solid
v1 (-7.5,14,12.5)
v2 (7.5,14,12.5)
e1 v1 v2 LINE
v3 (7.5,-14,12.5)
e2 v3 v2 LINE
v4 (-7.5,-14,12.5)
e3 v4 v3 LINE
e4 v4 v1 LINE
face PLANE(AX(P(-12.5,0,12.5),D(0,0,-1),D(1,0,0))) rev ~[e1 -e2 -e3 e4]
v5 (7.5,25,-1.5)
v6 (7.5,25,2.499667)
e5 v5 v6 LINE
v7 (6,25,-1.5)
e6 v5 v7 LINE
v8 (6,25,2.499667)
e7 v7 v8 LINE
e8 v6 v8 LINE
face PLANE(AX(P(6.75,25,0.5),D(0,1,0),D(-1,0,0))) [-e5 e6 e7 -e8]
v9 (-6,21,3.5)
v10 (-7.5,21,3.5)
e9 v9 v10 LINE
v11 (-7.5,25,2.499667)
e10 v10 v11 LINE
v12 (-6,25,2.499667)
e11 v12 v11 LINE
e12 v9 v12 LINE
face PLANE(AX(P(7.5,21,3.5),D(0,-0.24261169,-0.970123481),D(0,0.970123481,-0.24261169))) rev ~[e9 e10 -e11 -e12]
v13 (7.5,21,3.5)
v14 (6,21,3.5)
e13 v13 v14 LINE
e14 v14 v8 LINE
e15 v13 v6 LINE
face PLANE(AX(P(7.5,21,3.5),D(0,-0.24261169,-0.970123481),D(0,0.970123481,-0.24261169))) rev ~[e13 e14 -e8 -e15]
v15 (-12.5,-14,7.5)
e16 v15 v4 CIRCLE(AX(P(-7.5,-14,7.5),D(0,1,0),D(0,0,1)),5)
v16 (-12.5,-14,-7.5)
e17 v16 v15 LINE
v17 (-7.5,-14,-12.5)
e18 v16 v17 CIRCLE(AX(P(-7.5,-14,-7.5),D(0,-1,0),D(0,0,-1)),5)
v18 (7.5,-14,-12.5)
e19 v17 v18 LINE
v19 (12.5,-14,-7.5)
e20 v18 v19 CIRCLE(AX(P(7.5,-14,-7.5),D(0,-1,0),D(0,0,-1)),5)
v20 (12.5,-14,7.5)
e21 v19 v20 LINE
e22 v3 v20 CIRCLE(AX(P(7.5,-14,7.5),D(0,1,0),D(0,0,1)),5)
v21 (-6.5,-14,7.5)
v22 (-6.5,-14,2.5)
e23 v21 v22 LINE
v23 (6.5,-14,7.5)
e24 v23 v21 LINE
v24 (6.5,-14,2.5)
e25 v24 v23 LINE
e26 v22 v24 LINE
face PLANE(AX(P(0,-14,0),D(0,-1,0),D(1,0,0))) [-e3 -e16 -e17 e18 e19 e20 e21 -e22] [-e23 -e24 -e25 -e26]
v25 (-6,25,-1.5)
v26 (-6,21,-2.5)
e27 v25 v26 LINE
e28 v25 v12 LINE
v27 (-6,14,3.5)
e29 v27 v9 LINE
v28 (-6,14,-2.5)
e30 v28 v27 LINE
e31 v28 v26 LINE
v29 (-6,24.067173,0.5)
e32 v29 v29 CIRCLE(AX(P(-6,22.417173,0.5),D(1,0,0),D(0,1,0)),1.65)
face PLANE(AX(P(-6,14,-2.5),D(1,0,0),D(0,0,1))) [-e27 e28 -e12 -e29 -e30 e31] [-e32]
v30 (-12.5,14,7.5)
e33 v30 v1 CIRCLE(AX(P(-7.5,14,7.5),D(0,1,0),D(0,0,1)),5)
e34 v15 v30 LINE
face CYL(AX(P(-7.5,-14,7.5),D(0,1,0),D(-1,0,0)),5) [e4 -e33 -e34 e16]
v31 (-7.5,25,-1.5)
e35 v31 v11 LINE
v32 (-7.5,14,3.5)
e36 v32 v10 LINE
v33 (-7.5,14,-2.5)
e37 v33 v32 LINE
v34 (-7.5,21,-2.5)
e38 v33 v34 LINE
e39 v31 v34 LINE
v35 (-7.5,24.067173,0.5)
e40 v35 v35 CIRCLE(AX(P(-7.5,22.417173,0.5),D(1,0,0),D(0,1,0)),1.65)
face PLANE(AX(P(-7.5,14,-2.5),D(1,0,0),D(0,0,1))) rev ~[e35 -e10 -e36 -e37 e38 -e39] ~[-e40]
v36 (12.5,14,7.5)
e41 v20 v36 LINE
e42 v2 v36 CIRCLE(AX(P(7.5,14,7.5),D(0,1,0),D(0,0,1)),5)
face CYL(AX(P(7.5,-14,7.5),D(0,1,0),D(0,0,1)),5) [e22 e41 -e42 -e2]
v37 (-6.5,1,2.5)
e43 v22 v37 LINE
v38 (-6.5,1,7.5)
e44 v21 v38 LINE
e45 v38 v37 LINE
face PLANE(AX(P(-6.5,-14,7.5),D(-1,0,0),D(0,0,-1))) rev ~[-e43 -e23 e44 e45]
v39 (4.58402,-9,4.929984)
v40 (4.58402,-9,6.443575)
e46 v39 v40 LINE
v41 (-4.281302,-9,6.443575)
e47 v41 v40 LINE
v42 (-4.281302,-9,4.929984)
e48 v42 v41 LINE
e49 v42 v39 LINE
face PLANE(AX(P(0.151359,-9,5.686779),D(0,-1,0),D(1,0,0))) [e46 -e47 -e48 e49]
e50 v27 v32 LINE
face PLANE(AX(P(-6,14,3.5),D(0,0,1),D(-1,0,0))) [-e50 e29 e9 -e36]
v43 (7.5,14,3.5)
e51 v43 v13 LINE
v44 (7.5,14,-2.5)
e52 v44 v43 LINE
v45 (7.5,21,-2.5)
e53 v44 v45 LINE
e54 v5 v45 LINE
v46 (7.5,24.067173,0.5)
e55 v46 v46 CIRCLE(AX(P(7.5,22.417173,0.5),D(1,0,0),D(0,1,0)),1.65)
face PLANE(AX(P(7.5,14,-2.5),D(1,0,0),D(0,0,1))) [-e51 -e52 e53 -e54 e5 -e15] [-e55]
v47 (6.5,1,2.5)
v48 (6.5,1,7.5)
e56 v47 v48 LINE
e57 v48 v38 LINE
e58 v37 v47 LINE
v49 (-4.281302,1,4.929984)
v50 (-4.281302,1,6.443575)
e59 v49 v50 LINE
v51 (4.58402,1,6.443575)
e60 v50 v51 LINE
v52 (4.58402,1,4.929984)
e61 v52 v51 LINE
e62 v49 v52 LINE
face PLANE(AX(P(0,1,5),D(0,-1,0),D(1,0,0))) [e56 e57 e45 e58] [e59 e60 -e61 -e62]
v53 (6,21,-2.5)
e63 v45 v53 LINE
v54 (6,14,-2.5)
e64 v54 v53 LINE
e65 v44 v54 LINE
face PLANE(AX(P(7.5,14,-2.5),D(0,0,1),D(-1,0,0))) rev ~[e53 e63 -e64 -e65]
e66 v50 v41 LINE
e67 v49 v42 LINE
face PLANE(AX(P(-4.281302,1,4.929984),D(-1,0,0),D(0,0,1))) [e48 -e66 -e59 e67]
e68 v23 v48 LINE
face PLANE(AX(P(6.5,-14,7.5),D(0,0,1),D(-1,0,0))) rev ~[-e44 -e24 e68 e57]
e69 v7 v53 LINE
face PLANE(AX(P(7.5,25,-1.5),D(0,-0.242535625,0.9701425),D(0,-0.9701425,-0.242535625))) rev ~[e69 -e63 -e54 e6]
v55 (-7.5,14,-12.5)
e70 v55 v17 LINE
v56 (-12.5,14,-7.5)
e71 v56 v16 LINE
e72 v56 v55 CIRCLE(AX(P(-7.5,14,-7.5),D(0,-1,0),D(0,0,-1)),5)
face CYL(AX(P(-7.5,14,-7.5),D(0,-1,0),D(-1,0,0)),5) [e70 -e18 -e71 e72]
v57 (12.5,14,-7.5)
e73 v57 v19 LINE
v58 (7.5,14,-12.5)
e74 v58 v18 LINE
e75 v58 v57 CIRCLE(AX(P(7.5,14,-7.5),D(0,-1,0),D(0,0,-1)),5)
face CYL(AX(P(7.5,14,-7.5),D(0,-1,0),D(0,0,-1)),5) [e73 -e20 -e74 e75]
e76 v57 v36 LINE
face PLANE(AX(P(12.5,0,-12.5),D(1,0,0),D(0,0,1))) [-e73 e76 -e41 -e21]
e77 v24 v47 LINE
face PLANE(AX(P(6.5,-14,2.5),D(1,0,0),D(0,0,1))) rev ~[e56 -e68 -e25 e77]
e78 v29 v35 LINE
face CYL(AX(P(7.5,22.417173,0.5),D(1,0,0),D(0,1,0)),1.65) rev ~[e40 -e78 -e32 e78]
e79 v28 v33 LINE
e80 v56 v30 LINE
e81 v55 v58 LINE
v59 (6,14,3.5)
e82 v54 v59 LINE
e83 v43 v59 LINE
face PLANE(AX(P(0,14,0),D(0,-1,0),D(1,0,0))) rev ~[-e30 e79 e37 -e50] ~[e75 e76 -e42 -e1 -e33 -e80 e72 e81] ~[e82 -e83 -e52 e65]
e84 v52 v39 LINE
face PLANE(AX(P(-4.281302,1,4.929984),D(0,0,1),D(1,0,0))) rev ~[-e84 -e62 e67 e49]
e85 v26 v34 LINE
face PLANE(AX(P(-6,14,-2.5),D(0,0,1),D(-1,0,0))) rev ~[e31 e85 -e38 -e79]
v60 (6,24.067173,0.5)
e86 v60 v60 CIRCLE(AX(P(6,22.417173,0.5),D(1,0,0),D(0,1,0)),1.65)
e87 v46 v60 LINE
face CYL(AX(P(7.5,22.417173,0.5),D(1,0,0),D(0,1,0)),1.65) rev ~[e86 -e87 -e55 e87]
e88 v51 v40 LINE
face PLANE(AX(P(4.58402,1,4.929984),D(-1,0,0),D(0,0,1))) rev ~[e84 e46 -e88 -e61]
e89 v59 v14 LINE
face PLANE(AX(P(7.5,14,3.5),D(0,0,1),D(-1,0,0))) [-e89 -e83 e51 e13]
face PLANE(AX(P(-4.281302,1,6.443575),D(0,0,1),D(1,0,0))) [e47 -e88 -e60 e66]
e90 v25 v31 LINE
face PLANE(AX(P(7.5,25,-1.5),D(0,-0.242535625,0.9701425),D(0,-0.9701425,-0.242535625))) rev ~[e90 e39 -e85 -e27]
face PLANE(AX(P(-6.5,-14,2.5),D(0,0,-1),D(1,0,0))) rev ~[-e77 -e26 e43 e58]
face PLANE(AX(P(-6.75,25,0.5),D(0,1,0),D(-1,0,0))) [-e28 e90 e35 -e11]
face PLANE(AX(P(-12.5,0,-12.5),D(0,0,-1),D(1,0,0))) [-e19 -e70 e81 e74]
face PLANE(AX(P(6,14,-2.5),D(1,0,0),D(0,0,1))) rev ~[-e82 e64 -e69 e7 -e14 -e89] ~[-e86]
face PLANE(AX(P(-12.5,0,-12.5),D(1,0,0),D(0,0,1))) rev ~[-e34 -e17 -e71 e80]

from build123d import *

# Parameters (mm, degrees)
F0_W      = 25
F0_H      = 25
F1_DEPTH  = 14
F3_DEPTH  = 15
F4_W      = 1.5
F4_H      = 6
F5_DEPTH  = 11
F6_R      = 1.65
F7_DEPTH  = 30.4
F8_R      = 5
F9_W      = 8.8653210551
F9_H      = 1.5135915019
F10_DEPTH = 10


with BuildPart() as f1:
    # F0 (on Front) → F1 (new body, symmetric)
    with BuildSketch(Plane.XZ):
        Rectangle(F0_W, F0_H)
    extrude(amount=F1_DEPTH, both=True)

    # F2 (on face) → F3 (cut)
    with BuildSketch(Plane.XZ.offset(14)):
        Polygon((-6.5, 2.5), (0, 2.5), (6.5, 2.5), (6.5, 7.5), (-6.5, 7.5), align=None)
    extrude(amount=-F3_DEPTH, mode=Mode.SUBTRACT)

    # F4 (on face) → F5 (join)
    with BuildSketch(Plane(origin=(0, 14, 0), x_dir=(-1, 0, 0), z_dir=(0, 1, 0))):
        with Locations((-6.75, 0.5)):
            Rectangle(F4_W, F4_H)
        with Locations((6.75, 0.5)):
            Rectangle(F4_W, F4_H)
    extrude(amount=F5_DEPTH)

    # F6 (on face) → F7 (cut)
    with BuildSketch(Plane.YZ.offset(7.5)):
        with Locations((22.4171727896, 0.5)):
            Circle(F6_R)
        Polygon((25, 2.4996667635), (25, 3.5), (21, 3.5), align=None)
        Polygon((25, -2.5), (25, -1.5), (21, -2.5), align=None)
    extrude(amount=-F7_DEPTH, mode=Mode.SUBTRACT)

    # F8
    f8_edges = [f1.edges().sort_by_distance(p)[0] for p in [
        (-12.5, 0, 12.5),
        (12.5, 0, 12.5),
        (12.5, 0, -12.5),
        (-12.5, 0, -12.5),
    ]]
    fillet(f8_edges, radius=F8_R)

    # F9 (on face) → F10 (join)
    with BuildSketch(Plane.XZ.offset(-1)):
        with Locations((0.1513590105, 5.6867792737)):
            Rectangle(F9_W, F9_H)
    extrude(amount=F10_DEPTH)


solid = f1.part
